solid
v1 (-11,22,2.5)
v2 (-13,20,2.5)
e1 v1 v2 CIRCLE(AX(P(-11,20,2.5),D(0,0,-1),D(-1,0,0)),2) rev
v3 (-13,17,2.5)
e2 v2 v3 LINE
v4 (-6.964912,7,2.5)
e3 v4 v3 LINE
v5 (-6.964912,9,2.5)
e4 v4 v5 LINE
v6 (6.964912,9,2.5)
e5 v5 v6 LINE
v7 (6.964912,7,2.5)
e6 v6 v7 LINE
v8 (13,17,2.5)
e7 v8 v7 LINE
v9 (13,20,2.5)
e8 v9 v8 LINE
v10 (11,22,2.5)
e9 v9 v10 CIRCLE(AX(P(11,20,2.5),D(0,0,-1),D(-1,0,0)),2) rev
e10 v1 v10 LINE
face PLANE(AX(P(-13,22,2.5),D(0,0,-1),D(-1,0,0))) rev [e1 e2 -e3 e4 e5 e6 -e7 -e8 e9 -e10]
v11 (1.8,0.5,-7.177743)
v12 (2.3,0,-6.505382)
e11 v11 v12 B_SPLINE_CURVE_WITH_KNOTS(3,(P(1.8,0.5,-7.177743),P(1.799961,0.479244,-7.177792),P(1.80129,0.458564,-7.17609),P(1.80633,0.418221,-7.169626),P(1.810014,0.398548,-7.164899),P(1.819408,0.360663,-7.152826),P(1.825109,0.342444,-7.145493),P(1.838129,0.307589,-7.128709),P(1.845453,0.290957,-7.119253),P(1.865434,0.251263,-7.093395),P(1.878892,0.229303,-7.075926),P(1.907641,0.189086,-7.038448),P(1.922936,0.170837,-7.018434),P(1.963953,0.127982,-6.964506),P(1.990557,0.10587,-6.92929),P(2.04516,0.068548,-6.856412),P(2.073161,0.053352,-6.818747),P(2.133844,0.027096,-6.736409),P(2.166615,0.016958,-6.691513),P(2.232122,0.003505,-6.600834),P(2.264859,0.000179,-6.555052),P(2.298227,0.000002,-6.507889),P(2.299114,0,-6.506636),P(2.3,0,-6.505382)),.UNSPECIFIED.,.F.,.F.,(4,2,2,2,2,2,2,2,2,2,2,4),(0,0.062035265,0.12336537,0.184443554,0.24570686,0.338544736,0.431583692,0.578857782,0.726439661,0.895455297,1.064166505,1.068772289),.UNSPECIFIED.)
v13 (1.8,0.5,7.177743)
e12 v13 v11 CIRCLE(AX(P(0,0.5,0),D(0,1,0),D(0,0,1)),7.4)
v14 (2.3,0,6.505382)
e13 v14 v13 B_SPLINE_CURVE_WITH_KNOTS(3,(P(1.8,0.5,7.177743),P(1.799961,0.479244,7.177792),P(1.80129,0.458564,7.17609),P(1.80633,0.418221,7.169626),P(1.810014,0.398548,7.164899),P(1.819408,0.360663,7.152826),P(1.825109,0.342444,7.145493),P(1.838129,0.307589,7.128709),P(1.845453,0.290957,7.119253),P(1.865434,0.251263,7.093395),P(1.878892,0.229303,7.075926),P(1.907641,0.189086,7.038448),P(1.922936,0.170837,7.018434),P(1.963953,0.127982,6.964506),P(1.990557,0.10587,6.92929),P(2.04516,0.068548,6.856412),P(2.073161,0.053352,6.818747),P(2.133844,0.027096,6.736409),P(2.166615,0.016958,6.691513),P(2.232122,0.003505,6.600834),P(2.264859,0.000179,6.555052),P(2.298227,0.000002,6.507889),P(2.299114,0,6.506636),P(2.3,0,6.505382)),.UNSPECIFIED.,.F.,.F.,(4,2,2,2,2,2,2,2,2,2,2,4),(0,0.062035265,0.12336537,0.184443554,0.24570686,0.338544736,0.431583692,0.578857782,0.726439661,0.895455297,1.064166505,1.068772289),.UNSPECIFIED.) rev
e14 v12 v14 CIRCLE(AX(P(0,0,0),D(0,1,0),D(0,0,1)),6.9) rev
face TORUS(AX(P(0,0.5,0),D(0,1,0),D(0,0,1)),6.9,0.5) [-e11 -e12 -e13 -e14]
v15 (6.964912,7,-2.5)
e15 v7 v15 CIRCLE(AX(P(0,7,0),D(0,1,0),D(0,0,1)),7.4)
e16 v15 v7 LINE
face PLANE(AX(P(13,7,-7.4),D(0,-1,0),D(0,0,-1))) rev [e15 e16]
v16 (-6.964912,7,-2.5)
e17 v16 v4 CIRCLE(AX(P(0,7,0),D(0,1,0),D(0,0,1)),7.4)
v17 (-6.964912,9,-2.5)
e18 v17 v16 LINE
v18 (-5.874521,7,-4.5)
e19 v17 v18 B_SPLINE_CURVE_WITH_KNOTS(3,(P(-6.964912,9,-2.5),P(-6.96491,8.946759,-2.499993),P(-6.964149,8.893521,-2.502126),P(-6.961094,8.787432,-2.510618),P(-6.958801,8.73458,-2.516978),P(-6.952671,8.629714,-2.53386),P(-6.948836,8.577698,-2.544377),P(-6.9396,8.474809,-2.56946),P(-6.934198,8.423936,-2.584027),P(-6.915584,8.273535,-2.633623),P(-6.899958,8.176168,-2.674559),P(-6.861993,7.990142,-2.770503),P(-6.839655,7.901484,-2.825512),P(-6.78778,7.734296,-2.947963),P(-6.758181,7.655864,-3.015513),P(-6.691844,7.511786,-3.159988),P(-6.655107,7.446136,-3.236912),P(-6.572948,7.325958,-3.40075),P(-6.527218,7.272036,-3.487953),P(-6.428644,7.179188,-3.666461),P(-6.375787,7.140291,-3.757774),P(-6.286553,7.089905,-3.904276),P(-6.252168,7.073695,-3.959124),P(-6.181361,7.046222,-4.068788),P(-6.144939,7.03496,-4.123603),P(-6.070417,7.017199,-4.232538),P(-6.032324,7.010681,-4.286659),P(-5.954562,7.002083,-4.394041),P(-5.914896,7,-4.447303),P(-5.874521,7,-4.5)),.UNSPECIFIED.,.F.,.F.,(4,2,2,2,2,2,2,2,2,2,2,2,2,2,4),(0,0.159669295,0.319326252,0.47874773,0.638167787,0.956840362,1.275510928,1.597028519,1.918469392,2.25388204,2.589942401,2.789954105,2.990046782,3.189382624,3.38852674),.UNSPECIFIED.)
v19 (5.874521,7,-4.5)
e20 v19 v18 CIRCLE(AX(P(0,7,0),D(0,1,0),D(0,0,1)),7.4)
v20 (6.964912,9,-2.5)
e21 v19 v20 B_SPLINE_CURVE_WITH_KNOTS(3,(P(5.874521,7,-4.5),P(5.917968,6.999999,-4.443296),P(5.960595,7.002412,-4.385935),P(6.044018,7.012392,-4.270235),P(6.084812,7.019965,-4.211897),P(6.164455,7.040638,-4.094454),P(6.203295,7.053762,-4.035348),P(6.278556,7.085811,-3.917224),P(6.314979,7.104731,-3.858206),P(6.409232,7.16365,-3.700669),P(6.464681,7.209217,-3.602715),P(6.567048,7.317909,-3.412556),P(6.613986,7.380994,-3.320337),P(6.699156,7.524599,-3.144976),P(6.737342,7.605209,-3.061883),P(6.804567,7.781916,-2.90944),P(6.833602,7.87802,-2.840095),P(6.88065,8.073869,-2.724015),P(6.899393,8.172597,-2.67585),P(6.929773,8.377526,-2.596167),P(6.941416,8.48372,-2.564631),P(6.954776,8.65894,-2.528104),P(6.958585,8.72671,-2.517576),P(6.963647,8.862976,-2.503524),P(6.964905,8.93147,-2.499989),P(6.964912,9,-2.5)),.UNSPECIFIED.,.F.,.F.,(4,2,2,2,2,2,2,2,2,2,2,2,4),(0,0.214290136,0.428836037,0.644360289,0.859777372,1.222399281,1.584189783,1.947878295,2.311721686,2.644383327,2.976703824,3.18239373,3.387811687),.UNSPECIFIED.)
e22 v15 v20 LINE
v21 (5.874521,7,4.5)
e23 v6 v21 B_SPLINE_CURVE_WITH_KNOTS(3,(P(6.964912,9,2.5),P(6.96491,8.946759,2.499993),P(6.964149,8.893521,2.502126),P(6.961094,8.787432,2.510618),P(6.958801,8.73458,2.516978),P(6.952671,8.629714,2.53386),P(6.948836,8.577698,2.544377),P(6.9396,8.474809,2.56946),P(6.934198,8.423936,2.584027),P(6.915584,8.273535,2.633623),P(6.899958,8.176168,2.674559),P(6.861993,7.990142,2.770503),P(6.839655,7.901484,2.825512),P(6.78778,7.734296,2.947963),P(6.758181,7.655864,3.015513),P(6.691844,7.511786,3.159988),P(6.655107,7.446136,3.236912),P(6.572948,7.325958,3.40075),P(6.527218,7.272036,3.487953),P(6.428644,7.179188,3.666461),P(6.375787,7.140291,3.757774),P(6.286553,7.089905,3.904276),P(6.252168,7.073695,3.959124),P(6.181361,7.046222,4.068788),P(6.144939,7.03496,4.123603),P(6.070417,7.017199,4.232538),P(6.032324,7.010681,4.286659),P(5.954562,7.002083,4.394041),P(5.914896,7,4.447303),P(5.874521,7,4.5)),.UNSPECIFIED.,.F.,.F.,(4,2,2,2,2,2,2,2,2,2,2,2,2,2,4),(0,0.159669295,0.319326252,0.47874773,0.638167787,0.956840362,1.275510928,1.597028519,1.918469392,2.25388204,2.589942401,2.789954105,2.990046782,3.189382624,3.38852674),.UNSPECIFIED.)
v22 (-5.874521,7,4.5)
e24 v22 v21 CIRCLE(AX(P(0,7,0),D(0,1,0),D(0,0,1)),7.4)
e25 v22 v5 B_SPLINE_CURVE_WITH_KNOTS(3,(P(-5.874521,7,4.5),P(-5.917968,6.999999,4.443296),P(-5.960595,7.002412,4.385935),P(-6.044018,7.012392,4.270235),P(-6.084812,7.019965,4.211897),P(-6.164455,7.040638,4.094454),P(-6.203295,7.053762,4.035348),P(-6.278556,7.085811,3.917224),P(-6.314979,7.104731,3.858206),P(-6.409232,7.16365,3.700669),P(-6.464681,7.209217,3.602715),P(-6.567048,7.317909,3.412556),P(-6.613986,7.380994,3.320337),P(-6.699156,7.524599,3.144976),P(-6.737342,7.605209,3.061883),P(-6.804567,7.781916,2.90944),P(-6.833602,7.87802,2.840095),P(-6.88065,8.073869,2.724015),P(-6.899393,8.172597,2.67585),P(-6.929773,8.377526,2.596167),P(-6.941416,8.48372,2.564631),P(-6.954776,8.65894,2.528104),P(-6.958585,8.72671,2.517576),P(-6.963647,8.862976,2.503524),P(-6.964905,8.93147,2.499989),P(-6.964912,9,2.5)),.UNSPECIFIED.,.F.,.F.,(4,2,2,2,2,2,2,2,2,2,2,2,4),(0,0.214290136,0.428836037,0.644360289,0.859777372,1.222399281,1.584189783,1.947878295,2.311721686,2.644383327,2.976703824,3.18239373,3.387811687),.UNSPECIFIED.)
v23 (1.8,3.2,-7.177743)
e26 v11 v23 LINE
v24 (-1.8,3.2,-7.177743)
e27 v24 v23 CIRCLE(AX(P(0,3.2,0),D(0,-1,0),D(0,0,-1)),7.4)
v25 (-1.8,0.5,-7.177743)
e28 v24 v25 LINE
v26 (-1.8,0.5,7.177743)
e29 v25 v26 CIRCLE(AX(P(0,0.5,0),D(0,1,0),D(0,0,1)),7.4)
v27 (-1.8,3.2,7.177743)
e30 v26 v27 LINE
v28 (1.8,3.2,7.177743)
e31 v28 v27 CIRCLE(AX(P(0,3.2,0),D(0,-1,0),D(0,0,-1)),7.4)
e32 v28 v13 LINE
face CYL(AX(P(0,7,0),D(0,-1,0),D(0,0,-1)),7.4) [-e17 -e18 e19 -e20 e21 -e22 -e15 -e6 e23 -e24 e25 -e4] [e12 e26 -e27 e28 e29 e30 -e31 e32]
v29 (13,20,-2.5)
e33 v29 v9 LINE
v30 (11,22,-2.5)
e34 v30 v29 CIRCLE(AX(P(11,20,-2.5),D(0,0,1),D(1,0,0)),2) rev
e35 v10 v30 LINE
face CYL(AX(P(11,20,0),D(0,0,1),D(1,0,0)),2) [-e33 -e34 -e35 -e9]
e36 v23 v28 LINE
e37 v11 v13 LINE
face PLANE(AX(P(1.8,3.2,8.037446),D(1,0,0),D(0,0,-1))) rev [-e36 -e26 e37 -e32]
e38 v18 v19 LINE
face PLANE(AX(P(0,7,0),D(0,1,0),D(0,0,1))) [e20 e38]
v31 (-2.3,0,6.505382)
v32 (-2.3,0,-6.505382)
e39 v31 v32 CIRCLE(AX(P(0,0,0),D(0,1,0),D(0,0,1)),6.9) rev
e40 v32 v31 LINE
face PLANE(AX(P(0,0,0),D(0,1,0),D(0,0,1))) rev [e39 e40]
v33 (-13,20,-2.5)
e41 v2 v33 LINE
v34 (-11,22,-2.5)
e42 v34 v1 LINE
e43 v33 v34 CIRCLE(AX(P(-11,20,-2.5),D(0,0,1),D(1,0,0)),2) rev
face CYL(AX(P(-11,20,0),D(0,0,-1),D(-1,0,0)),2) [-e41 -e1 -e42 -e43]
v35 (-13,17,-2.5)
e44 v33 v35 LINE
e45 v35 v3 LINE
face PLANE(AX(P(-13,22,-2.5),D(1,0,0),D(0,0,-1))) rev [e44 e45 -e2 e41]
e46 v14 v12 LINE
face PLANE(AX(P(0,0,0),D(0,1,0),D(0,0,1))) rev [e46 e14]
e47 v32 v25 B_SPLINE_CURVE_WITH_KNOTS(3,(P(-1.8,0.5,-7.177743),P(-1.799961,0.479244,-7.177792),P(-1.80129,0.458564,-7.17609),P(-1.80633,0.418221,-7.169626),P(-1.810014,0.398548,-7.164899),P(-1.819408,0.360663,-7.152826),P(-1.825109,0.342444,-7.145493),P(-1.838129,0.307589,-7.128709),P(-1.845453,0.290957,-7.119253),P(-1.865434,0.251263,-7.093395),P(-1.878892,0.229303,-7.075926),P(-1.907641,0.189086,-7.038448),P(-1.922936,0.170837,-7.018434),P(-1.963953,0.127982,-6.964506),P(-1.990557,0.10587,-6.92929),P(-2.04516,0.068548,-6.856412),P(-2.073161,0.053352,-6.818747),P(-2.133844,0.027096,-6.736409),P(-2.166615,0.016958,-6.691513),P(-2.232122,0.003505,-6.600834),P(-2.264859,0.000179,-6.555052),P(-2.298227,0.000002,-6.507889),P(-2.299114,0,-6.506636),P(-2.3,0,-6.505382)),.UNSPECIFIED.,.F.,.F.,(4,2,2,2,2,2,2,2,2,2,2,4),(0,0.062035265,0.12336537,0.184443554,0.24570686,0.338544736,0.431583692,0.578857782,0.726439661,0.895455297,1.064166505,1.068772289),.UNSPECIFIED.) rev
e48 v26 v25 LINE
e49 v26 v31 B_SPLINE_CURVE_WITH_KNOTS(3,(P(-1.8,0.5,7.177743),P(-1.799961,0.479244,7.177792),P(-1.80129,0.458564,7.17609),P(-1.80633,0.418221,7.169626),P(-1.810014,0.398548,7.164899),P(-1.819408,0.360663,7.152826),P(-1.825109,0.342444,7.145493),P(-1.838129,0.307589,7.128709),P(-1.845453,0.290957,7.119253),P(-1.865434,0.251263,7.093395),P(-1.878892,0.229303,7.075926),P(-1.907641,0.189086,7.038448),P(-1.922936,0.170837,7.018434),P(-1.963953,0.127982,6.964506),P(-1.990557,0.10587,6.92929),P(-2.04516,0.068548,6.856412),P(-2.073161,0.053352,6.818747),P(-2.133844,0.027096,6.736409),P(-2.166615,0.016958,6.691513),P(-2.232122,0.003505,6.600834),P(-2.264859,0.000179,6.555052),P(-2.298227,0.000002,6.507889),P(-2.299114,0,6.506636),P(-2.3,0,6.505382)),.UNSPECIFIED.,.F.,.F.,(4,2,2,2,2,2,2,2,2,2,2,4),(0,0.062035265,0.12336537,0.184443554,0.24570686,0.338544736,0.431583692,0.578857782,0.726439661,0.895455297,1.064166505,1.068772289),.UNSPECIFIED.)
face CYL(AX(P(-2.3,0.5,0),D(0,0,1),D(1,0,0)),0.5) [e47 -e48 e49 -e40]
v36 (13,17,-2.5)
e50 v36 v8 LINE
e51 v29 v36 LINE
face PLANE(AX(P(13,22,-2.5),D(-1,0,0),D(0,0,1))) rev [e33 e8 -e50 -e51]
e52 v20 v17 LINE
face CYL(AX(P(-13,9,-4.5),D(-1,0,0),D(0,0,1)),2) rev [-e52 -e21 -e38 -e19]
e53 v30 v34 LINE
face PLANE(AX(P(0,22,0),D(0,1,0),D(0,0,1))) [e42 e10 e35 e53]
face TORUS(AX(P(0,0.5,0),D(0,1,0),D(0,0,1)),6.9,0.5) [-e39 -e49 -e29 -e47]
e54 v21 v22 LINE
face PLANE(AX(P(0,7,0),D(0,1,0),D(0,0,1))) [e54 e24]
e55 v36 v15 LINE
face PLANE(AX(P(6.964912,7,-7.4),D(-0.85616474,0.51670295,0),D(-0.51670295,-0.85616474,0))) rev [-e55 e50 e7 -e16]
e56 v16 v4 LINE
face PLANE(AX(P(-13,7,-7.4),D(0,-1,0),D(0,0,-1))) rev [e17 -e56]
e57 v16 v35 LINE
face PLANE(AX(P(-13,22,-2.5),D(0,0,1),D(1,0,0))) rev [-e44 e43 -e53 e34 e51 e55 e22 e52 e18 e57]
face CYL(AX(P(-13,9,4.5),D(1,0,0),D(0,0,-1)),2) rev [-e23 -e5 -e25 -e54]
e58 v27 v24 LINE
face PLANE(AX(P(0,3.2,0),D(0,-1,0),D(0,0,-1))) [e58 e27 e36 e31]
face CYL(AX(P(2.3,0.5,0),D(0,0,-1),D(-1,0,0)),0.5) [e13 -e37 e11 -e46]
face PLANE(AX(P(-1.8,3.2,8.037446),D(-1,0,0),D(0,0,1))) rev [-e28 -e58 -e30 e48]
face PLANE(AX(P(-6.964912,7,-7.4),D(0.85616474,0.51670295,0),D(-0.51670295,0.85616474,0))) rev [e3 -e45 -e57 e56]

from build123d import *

# Parameters (mm, degrees)
SKETCH1_R           = 7.4
BOSS_EXTRUDE1_DEPTH = 7
SKETCH2_W           = 3.6
SKETCH2_H           = 16.327847923
CUT_EXTRUDE1_DEPTH  = 3.2
FILLET1_R           = 0.5
SKETCH3_W           = 26
SKETCH3_H           = 5
BOSS_EXTRUDE2_DEPTH = 15
CUT_EXTRUDE2_DEPTH  = 28.404561664
FILLET2_R           = 2
FILLET3_R           = 2


with BuildPart() as part:
    # Sketch1 → Boss-Extrude1 (new body)
    with BuildSketch(Plane(origin=(0, 0, 0), x_dir=(1, 0, 0), z_dir=(0, 1, 0))):
        with Locations(Location((0, 0, 0), (0, 0, 270))):
            Circle(SKETCH1_R)
    extrude(amount=BOSS_EXTRUDE1_DEPTH)

    # Sketch2 → Cut-Extrude1 (cut)
    with BuildSketch(Plane.XZ):
        with Locations((0, -0.126477582)):
            Rectangle(SKETCH2_W, SKETCH2_H)
    extrude(amount=-CUT_EXTRUDE1_DEPTH, mode=Mode.SUBTRACT)

    # Fillet1
    fillet1_edges = [part.edges().sort_by_distance(p)[0] for p in [
        (7.4, 0, 0),
        (-7.4, 0, 0),
        (1.8, 0, 0),
        (-1.8, 0, 0),
    ]]
    fillet(fillet1_edges, radius=FILLET1_R)

    # Sketch3 → Boss-Extrude2 (add)
    with BuildSketch(Plane(origin=(0, 7, 0), x_dir=(1, 0, 0), z_dir=(0, 1, 0))):
        Rectangle(SKETCH3_W, SKETCH3_H)
    extrude(amount=BOSS_EXTRUDE2_DEPTH)

    # Sketch4 → Cut-Extrude2 (cut, through all)
    with BuildSketch(Plane.XY.offset(2.5)):
        Polygon((-6.96491206, 7), (-13, 17), (-13, 7), align=None)
        Polygon((6.96491206, 7), (13, 17), (13, 7), align=None)
    extrude(amount=-CUT_EXTRUDE2_DEPTH, mode=Mode.SUBTRACT)

    # Fillet2
    fillet2_edges = [part.edges().sort_by_distance(p)[0] for p in [
        (-13, 22, 0),
        (13, 22, 0),
    ]]
    fillet(fillet2_edges, radius=FILLET2_R)

    # Fillet3
    # the kernel refuses this fillet: 2 mm, written as the material it adds along each edge
    with BuildSketch(Plane(origin=(11.96491206, 7, 2.5), x_dir=(0, 1, 0), z_dir=(-1, 0, 0))) as fillet3_piece_1_section:
        with BuildLine():
            CenterArc((FILLET3_R, -FILLET3_R), FILLET3_R, 90, 90)
            Line((0, -FILLET3_R), (0, 0))
            Line((0, 0), (FILLET3_R, 0))
        make_face()
    fillet3_piece_1 = extrude(amount=23.929824119, mode=Mode.PRIVATE)
    fillet3_piece_1 = fillet3_piece_1 & Plane(origin=(0, 7.46029714, 0), x_dir=(0, 0, 1), z_dir=(0, -1, 0)) * Cylinder(7.4, 56, mode=Mode.PRIVATE)
    add(fillet3_piece_1)
    with BuildSketch(Plane(origin=(-11.96491206, 7, -2.5), x_dir=(0, 1, 0), z_dir=(1, 0, 0))) as fillet3_piece_2_section:
        with BuildLine():
            CenterArc((FILLET3_R, -FILLET3_R), FILLET3_R, 90, 90)
            Line((0, -FILLET3_R), (0, 0))
            Line((0, 0), (FILLET3_R, 0))
        make_face()
    fillet3_piece_2 = extrude(amount=23.929824119, mode=Mode.PRIVATE)
    fillet3_piece_2 = fillet3_piece_2 & Plane(origin=(0, 7.460297172, 0), x_dir=(0, 0, 1), z_dir=(0, -1, 0)) * Cylinder(7.4, 56, mode=Mode.PRIVATE)
    add(fillet3_piece_2)


solid = part.part
